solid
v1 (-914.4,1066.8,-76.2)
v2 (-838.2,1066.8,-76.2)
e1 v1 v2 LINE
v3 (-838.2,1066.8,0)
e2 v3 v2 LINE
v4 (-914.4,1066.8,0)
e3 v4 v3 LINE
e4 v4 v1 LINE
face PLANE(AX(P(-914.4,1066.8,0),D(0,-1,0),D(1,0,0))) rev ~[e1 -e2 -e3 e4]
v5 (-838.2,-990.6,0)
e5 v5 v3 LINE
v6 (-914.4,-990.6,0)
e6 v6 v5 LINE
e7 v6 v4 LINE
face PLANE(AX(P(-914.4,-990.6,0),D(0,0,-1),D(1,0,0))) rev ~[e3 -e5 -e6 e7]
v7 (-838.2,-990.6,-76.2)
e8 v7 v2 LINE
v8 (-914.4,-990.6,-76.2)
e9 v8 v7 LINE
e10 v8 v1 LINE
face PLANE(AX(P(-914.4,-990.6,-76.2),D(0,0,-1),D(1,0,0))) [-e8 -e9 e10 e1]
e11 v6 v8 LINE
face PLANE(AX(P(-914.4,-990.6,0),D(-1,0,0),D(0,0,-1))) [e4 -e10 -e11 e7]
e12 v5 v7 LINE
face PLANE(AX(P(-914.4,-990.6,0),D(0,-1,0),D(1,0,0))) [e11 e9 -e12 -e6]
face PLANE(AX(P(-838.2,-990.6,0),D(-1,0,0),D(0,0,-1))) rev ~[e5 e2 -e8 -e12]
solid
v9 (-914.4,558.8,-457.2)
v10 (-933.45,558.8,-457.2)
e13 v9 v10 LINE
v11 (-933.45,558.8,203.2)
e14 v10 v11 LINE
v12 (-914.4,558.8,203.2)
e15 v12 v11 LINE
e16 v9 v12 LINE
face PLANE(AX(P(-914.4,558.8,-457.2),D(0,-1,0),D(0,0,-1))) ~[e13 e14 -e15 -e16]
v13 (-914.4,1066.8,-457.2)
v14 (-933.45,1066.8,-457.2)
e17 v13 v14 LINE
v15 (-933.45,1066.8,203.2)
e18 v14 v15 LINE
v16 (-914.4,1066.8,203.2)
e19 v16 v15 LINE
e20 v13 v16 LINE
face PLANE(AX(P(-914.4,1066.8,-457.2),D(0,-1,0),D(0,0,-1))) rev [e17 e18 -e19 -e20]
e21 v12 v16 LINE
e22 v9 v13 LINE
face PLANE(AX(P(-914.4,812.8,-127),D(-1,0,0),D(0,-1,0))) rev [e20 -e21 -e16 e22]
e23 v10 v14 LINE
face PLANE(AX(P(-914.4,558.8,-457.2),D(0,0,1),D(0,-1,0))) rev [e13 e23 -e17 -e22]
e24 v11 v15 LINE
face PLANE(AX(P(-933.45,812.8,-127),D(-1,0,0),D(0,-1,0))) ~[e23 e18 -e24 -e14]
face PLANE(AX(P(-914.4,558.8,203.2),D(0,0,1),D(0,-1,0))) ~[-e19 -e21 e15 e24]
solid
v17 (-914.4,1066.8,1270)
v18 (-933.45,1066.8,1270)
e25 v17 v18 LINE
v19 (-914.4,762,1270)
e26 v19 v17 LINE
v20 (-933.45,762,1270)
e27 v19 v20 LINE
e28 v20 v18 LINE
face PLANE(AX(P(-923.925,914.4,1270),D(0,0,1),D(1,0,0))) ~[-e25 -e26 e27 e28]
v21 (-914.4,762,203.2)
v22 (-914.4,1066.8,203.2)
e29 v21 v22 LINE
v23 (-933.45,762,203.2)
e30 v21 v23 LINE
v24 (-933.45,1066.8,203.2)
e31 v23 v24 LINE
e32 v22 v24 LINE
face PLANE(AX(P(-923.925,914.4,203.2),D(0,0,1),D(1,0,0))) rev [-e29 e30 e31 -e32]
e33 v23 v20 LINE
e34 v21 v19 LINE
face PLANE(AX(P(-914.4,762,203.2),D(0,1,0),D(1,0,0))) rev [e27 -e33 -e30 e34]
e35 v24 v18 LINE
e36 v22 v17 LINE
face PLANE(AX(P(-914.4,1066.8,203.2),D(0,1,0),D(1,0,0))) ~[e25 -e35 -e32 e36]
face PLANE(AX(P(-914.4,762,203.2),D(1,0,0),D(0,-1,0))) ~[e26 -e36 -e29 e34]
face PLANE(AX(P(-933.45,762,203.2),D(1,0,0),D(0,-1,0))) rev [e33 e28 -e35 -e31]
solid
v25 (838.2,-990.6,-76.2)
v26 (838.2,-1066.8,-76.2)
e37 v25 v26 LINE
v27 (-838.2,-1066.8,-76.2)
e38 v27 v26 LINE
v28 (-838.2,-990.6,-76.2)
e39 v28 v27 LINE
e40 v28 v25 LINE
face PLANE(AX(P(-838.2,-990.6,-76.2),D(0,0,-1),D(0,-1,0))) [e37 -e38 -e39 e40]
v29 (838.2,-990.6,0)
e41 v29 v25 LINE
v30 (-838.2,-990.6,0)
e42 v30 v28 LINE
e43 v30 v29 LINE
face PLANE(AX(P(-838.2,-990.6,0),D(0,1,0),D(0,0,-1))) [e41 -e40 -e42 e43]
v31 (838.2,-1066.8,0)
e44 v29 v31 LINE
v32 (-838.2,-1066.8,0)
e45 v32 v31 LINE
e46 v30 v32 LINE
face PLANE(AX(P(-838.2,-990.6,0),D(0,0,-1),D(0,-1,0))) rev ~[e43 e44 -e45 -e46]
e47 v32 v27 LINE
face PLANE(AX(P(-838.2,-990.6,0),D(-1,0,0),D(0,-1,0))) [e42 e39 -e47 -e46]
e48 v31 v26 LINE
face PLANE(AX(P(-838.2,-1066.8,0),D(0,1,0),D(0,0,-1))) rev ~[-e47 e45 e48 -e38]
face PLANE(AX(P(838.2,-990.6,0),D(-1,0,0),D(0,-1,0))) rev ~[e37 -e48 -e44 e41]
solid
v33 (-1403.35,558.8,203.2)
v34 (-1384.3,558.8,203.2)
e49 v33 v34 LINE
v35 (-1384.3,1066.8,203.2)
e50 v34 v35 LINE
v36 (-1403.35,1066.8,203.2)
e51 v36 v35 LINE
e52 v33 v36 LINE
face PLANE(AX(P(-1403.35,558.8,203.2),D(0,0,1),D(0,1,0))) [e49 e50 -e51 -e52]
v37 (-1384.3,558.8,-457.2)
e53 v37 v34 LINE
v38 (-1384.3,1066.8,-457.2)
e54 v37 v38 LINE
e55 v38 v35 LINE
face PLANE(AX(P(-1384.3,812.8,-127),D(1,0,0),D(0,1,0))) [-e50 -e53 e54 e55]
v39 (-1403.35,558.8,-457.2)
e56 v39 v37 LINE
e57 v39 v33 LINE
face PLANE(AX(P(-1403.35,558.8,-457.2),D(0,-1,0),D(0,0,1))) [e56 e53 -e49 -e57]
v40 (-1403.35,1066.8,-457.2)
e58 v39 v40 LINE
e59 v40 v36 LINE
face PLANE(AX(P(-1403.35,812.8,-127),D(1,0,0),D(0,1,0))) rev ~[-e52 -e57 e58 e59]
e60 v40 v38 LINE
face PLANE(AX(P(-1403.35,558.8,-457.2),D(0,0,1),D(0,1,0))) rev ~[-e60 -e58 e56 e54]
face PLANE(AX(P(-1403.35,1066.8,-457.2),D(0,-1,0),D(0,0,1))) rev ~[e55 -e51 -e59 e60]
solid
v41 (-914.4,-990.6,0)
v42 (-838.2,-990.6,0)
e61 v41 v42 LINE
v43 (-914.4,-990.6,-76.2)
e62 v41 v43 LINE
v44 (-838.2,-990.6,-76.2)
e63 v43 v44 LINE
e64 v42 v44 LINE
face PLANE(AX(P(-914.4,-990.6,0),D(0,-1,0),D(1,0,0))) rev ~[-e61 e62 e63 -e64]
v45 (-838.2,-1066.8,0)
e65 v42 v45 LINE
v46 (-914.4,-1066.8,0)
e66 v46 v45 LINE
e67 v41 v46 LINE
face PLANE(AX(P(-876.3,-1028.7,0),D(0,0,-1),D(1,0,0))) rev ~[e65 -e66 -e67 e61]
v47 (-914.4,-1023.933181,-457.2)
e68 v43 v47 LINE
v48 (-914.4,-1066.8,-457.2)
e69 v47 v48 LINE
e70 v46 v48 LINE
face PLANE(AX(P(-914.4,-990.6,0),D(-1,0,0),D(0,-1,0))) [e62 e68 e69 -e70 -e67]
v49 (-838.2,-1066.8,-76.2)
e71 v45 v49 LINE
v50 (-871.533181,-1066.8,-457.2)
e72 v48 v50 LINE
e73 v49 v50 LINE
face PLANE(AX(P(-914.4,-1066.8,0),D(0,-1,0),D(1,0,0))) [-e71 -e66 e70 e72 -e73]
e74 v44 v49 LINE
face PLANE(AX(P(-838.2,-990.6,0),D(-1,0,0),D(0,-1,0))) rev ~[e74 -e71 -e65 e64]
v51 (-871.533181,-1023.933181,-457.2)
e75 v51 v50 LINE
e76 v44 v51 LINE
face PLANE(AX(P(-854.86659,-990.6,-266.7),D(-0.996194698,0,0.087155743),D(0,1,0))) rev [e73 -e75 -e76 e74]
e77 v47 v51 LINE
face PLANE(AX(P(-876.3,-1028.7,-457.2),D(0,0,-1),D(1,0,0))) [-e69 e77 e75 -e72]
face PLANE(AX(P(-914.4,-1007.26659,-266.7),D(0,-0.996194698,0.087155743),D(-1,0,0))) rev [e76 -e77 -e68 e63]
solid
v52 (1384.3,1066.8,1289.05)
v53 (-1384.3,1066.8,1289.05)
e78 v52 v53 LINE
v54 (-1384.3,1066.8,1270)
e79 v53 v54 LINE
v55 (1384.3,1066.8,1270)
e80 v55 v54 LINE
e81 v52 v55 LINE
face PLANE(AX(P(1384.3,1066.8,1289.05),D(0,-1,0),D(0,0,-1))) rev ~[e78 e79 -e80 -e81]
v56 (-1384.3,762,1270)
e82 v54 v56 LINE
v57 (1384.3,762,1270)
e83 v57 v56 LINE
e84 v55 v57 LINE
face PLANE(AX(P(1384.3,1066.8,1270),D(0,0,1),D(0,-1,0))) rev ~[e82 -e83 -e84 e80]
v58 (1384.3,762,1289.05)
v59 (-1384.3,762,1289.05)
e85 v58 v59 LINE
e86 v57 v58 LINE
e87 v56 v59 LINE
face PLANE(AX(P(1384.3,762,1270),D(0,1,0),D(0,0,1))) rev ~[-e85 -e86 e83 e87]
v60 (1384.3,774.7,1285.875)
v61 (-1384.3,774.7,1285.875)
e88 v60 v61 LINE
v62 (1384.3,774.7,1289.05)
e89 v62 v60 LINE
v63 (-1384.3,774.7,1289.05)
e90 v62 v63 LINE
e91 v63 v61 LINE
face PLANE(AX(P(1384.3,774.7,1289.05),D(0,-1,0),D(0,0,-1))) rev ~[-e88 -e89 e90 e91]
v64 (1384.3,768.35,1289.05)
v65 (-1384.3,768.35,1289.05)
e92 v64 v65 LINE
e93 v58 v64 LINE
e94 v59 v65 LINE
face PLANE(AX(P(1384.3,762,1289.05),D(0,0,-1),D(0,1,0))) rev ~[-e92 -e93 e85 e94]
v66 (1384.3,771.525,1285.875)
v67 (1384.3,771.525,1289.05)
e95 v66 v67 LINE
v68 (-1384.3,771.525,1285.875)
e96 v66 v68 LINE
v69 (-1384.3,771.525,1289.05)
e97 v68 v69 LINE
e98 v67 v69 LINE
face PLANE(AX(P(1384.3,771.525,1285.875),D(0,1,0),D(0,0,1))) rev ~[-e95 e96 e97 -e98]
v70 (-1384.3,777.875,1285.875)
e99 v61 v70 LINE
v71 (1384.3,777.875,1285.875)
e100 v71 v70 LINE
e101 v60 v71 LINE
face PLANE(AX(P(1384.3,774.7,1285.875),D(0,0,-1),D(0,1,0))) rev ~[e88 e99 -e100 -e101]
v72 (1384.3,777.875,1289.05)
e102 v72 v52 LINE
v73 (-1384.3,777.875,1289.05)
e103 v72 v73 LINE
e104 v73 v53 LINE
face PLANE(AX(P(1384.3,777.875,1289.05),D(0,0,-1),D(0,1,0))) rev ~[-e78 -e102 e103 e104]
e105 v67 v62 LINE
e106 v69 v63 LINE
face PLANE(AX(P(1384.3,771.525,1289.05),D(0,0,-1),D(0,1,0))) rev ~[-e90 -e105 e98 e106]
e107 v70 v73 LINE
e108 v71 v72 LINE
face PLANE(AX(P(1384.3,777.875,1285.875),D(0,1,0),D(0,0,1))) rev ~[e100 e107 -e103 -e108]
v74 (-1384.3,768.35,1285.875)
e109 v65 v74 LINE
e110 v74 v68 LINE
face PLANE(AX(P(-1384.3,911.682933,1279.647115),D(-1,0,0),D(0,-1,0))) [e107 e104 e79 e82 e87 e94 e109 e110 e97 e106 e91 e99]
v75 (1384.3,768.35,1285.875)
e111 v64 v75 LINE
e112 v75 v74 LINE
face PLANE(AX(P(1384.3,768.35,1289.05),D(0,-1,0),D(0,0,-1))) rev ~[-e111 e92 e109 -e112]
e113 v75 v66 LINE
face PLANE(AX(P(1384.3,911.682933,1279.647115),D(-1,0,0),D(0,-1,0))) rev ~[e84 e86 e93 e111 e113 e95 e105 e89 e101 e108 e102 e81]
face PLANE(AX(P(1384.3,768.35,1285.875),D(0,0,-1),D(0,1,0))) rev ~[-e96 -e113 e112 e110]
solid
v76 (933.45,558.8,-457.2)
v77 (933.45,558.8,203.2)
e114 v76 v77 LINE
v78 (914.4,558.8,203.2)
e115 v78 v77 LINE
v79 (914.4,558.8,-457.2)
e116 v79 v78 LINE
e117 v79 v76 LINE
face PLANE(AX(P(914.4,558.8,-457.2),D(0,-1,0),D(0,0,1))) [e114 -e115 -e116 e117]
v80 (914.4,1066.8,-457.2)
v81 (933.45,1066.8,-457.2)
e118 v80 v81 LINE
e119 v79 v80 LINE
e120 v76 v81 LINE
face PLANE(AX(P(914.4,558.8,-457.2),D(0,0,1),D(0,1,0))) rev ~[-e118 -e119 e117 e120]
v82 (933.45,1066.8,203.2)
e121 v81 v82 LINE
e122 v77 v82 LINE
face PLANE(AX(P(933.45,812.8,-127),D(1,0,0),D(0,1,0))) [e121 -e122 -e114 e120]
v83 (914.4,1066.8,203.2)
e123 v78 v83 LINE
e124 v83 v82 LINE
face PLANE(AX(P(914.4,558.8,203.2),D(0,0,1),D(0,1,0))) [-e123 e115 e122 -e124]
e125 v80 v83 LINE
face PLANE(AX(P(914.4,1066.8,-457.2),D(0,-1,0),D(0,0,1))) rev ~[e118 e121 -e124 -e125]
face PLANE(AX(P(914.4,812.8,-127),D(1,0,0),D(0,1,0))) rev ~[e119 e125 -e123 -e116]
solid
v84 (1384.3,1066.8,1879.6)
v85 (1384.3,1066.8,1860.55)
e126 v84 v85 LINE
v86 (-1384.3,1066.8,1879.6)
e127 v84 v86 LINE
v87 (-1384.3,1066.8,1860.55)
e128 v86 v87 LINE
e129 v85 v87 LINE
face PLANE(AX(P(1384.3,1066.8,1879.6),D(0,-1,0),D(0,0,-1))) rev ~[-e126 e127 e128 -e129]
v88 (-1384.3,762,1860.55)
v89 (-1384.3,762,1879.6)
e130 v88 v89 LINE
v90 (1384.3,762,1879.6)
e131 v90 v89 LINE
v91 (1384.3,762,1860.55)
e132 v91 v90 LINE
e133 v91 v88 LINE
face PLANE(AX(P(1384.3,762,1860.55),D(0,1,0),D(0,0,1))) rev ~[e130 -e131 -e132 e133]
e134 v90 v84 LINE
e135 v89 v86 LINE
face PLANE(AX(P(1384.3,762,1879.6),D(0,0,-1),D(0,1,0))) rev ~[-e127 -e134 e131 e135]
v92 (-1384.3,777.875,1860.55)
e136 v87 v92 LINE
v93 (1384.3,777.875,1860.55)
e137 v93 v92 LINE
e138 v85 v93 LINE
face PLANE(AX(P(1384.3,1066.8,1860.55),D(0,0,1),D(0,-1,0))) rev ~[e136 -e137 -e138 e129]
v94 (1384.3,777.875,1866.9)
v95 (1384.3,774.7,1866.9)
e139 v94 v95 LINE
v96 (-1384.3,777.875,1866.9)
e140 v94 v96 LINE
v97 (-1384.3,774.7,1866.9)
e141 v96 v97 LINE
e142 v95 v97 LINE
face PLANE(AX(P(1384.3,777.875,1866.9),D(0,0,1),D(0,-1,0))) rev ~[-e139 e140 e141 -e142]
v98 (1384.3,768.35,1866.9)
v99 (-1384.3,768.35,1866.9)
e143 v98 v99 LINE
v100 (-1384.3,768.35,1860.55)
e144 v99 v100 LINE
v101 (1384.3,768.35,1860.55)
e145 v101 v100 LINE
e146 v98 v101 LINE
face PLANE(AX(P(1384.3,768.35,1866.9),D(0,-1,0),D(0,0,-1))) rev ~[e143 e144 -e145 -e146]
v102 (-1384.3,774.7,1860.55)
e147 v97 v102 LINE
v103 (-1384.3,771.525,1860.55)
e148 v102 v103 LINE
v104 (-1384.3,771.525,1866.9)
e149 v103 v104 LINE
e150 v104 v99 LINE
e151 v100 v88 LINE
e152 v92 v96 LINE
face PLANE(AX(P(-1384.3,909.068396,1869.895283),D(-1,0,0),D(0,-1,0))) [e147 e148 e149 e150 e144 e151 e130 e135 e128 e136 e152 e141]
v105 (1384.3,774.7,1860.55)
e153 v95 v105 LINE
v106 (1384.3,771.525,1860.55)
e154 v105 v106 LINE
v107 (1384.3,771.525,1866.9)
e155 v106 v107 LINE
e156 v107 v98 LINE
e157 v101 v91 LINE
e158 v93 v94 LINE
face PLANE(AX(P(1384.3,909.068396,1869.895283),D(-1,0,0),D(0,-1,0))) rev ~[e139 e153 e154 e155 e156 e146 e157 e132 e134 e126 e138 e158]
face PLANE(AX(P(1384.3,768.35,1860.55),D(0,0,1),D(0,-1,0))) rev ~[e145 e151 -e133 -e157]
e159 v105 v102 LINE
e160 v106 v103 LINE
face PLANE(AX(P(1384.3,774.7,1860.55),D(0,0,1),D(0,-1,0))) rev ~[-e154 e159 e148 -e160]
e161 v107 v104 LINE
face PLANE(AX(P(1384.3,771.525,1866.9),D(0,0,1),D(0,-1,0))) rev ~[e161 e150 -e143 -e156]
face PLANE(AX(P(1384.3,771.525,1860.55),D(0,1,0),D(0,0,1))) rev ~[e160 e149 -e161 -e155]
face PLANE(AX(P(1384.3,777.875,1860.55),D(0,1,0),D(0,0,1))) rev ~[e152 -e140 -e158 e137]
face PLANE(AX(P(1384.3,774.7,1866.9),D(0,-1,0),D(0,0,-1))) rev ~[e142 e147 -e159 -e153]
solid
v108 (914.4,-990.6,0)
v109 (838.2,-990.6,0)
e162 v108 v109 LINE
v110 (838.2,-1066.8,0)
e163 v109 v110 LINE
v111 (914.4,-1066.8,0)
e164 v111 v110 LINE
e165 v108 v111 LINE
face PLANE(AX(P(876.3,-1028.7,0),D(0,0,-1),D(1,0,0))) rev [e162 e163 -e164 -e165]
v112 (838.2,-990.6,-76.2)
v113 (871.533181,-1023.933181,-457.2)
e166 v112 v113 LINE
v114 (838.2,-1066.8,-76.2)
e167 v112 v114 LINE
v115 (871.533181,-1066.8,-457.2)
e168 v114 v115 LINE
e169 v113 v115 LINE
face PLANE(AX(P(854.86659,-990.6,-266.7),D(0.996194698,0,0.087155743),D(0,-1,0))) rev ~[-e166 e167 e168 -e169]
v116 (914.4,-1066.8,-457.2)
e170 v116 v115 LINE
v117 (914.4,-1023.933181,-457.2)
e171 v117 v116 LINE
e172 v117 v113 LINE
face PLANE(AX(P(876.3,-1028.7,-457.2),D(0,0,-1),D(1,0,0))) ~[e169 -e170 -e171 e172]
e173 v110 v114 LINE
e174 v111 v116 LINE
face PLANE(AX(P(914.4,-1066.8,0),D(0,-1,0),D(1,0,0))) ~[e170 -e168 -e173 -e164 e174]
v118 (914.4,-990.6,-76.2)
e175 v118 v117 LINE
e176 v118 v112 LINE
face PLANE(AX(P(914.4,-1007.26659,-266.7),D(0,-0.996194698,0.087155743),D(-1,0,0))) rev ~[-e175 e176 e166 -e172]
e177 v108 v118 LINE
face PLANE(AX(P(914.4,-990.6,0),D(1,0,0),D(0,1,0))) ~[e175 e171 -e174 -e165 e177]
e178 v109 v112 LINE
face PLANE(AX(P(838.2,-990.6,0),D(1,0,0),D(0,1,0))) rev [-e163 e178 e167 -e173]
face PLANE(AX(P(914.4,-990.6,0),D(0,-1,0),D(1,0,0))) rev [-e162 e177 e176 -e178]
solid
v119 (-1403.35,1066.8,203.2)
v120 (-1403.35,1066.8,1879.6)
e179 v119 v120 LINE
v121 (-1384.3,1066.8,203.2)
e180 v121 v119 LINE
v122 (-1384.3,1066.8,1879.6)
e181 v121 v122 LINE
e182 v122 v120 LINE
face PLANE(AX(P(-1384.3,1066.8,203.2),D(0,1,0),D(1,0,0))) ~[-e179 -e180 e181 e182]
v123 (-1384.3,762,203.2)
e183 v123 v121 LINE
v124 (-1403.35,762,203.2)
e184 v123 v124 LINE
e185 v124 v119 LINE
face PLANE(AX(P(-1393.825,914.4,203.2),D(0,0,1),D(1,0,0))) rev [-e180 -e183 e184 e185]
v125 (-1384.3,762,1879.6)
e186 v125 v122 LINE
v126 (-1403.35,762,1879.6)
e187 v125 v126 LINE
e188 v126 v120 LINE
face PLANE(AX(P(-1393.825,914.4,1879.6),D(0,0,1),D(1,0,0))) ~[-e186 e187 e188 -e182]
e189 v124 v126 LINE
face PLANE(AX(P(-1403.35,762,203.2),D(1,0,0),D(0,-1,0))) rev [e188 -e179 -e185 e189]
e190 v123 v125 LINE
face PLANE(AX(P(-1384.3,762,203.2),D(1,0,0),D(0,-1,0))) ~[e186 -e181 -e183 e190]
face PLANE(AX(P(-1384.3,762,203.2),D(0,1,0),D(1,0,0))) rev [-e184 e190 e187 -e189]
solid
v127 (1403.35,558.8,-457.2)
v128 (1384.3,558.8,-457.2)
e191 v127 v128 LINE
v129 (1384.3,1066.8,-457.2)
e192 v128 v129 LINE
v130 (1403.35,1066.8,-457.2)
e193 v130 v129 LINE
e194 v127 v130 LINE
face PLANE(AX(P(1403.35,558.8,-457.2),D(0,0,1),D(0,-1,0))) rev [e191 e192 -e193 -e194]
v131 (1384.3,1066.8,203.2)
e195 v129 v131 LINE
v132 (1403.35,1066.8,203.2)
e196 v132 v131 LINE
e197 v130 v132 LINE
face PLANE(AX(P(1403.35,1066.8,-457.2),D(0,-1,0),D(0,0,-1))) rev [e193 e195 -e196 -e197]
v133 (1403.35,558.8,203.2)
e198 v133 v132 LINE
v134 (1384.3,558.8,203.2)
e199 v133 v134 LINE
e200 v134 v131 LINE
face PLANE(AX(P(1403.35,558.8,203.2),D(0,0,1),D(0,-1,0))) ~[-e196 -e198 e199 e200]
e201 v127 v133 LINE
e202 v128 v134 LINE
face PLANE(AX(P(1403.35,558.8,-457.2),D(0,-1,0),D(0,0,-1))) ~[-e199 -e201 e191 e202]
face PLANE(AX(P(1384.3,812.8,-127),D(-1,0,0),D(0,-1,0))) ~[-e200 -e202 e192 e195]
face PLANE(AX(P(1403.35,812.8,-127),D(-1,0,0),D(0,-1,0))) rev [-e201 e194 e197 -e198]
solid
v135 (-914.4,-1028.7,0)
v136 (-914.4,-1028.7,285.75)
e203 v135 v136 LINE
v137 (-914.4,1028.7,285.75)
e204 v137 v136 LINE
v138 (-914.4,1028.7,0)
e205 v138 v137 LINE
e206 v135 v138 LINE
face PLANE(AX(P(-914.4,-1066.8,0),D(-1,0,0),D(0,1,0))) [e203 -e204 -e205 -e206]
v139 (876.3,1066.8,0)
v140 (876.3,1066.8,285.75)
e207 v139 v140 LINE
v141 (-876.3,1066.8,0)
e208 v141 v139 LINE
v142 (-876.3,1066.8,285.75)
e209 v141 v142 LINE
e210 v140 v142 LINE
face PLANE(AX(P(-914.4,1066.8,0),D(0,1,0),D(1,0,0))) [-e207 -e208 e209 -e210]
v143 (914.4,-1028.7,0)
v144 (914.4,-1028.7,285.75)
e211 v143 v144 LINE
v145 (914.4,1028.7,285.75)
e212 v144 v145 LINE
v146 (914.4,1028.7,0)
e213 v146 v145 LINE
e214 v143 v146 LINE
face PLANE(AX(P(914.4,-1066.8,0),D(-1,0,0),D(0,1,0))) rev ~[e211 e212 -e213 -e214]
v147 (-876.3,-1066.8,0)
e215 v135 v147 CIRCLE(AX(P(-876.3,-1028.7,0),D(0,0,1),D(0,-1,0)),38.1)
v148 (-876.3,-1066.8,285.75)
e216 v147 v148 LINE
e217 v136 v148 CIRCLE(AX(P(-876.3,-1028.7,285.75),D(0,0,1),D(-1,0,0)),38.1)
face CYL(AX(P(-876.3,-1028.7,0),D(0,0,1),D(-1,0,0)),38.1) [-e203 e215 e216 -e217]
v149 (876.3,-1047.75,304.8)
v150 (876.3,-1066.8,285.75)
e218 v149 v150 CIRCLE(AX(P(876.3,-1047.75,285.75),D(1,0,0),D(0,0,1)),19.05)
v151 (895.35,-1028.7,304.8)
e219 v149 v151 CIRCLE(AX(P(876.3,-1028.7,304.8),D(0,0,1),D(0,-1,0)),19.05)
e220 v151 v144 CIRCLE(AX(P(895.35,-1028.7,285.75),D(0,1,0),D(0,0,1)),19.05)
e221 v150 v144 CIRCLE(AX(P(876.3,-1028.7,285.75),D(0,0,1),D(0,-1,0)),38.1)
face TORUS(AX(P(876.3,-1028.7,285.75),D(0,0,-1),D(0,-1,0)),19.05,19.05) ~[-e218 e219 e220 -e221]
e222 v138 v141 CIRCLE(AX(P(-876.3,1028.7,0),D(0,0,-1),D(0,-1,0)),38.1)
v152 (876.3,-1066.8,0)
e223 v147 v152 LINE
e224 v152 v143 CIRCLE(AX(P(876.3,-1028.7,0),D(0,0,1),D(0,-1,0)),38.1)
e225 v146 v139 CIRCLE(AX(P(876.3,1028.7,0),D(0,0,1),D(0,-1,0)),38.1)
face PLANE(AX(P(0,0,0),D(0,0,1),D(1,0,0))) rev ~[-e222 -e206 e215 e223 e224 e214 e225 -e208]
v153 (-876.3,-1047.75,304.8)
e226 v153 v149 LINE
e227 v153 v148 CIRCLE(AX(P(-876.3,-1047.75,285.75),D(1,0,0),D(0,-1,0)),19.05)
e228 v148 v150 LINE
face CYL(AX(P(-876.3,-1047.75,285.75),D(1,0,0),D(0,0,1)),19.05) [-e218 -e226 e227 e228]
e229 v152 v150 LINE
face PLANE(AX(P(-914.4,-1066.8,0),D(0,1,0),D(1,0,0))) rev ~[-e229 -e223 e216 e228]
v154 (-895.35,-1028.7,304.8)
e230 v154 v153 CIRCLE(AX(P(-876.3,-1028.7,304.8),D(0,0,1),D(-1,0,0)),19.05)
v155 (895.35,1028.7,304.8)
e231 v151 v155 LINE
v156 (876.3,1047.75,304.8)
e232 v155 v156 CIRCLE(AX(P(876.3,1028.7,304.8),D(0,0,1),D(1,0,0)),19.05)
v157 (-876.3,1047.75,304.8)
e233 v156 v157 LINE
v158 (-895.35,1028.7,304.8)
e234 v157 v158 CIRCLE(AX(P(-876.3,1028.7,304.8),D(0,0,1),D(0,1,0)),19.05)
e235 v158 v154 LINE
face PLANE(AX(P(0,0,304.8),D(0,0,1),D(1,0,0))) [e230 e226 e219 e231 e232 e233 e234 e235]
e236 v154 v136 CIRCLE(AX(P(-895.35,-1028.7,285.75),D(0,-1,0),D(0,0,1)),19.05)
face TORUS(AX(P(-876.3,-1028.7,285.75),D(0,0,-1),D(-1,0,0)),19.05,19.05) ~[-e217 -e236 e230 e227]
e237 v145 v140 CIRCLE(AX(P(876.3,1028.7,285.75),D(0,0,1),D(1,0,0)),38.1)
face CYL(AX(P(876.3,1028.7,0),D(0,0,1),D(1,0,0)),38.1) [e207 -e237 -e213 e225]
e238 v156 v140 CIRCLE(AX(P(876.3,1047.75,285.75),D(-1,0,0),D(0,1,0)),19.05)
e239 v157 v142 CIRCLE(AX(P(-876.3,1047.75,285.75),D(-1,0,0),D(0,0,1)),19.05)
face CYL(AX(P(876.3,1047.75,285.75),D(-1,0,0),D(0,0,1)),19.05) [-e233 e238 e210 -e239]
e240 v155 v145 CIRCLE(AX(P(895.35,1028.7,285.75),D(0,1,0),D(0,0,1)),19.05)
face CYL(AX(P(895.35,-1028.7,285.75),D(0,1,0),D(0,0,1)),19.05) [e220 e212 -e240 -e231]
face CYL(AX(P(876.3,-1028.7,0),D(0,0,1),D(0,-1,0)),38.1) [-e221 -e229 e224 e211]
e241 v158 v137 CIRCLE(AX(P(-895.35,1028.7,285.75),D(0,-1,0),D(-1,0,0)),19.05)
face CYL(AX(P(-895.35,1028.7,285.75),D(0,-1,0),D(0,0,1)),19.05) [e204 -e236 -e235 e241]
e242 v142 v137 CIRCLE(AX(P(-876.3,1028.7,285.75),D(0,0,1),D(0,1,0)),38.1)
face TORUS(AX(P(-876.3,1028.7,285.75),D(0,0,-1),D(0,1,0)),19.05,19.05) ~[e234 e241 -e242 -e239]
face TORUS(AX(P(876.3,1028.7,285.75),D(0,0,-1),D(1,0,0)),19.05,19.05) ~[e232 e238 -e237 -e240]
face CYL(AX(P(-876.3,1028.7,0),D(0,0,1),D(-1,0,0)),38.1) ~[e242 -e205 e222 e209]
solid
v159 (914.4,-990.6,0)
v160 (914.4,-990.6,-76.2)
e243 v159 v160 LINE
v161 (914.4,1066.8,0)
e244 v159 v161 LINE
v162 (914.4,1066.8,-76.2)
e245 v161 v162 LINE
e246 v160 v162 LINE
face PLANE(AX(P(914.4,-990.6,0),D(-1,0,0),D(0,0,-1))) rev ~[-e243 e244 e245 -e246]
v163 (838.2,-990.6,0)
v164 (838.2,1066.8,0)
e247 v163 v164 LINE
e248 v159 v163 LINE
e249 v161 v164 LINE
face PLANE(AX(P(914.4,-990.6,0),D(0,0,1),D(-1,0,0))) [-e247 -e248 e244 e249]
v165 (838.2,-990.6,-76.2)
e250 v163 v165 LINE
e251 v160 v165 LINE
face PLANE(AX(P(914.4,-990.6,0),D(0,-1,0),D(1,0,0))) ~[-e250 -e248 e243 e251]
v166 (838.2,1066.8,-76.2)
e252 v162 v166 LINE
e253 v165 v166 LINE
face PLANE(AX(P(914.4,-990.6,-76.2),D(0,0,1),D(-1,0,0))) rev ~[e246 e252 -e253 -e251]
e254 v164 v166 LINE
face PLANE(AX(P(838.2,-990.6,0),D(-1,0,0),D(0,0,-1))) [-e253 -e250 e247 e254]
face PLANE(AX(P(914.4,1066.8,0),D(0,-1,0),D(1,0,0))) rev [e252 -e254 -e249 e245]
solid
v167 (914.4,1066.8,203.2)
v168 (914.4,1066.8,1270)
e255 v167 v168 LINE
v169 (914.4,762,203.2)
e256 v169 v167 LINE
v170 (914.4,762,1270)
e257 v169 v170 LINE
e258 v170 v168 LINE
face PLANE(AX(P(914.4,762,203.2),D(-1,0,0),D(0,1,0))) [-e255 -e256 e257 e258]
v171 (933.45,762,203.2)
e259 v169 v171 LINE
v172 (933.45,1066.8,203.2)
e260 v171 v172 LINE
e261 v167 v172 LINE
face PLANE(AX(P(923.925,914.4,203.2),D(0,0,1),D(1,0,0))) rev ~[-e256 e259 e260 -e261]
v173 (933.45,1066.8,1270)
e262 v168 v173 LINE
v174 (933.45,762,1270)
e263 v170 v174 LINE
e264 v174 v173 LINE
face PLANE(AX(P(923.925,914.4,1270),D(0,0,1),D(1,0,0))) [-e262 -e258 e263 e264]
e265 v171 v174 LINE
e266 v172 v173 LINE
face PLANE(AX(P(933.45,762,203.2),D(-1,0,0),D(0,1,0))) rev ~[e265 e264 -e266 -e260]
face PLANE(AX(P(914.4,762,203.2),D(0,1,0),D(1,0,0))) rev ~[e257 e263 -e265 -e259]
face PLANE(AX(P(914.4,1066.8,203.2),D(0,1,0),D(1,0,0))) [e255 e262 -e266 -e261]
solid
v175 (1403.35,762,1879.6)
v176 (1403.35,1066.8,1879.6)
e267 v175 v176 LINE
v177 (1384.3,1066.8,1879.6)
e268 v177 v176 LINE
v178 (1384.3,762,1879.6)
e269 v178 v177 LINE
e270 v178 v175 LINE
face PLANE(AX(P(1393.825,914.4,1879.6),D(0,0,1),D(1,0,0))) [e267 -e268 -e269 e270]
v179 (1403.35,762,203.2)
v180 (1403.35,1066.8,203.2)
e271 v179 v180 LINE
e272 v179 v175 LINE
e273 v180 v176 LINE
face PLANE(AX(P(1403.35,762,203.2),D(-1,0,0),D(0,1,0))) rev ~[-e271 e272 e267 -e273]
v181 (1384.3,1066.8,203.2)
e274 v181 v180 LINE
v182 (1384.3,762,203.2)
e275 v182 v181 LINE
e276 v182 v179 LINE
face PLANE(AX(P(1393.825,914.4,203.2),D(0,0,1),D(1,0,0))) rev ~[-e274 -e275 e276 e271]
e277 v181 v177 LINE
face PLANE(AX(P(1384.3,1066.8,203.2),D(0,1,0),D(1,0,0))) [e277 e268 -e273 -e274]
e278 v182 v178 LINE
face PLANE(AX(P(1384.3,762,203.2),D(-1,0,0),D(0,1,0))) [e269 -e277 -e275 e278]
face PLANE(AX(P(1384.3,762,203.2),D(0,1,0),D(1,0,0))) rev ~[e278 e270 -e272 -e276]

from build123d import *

# Parameters (mm, degrees)
F0_W      = 1828.8
F0_H      = 2133.6
F1_DEPTH  = 304.8
F2_R      = 38.1
F3_R      = 19.05
F5_W      = 76.2
F5_H      = 76.2
F6_DEPTH  = 457.2
F7_SIZE2  = 33.3331808034
F7_SIZE   = 381
F9_DEPTH  = 1676.4
F10_DEPTH = 2057.4
F11_W     = 508
F11_H     = 660.4
F12_DEPTH = 19.05
F15_W     = 19.05
F15_H     = 304.8
F16_DEPTH = 1676.4
F17_DEPTH = 1066.8
F20_DEPTH = 2768.6


with BuildPart() as f1:
    # F0 (on Top) → F1 (new body)
    with BuildSketch(Plane.XY):
        Rectangle(F0_W, F0_H)
    extrude(amount=F1_DEPTH)

    # F2
    f2_edges = [f1.edges().sort_by_distance(p)[0] for p in [
        (-914.4, -1066.8, 152.4),
        (914.4, -1066.8, 152.4),
        (914.4, 1066.8, 152.4),
        (-914.4, 1066.8, 152.4),
    ]]
    fillet(f2_edges, radius=F2_R)

    # F3
    f3_edges = [f1.edges().sort_by_distance(p)[0] for p in [
        (914.4, 0, 304.8),
        (903.240768, -1055.640768, 304.8),
        (903.240768, 1055.640768, 304.8),
        (0, -1066.8, 304.8),
        (0, 1066.8, 304.8),
        (-903.240768, -1055.640768, 304.8),
        (-903.240768, 1055.640768, 304.8),
        (-914.4, 0, 304.8),
    ]]
    fillet(f3_edges, radius=F3_R)


with BuildPart() as f6:
    # F5 (on face) → F6 (new body)
    with BuildSketch(Plane(origin=(0, 0, 0), x_dir=(1, 0, 0), z_dir=(0, 0, -1))):
        with Locations((-876.3, 1028.7)):
            Rectangle(F5_W, F5_H)
    extrude(amount=F6_DEPTH)

    # F7
    f7_edges = [f6.edges().sort_by_distance(p)[0] for p in [
        (-876.3, -990.6, -457.2),
        (-838.2, -1028.7, -457.2),
    ]]
    chamfer(f7_edges, length=F7_SIZE, length2=F7_SIZE2)


with BuildPart() as f8_1:
    # F8: instance of F6
    add(f6.part.mirror(Plane.YZ))


with BuildPart() as f9:
    # F9 (new, through all): a face of the model
    f9_faces = [f6.part.faces().sort_by_distance(p)[0] for p in [
        (-838.2, -1028.7, -38.1),
    ]]
    extrude(f9_faces, amount=F9_DEPTH)


with BuildPart() as f10:
    # F10 (new, through all): a face of the model
    f10_faces = [f8_1.part.faces().sort_by_distance(p)[0] for p in [
        (876.3, -990.6, -38.1),
    ]]
    extrude(f10_faces, amount=F10_DEPTH)


with BuildPart() as f10b:
    # F10#2 (new, through all): a face of the model
    f10_2_faces = [f6.part.faces().sort_by_distance(p)[0] for p in [
        (-876.3, -990.6, -38.1),
    ]]
    extrude(f10_2_faces, amount=F10_DEPTH)


with BuildPart() as f12:
    # F11 (on face) → F12 (new body)
    with BuildSketch(Plane.YZ.offset(914.4)):
        with Locations((812.8, -127)):
            Rectangle(F11_W, F11_H)
    extrude(amount=F12_DEPTH)


with BuildPart() as f14_1:
    # F14: instance of F12
    add(f12.part.mirror(Plane(origin=(1158.875, 812.8, -127), x_dir=(0, 1, 0), z_dir=(1, 0, 0))))


with BuildPart() as f16:
    # F15 (on face) → F16 (new body)
    with BuildSketch(Plane.XY.offset(203.2)):
        with Locations((1393.825, 914.4)):
            Rectangle(F15_W, F15_H)
    extrude(amount=F16_DEPTH)


with BuildPart() as f17:
    # F15 (on face) → F17 (new body, through all)
    with BuildSketch(Plane.XY.offset(203.2)):
        with Locations((923.925, 914.4)):
            Rectangle(F15_W, F15_H)
    extrude(amount=F17_DEPTH)


with BuildPart() as f18_1:
    # F18: instance of F12
    add(f12.part.mirror(Plane.YZ))


with BuildPart() as f18_2:
    # F18: instance of F16
    add(f16.part.mirror(Plane.YZ))


with BuildPart() as f18_3:
    # F18: instance of F14_1
    add(f14_1.part.mirror(Plane.YZ))


with BuildPart() as f18_4:
    # F18: instance of F17
    add(f17.part.mirror(Plane.YZ))


with BuildPart() as f20:
    # F19 (on face) → F20 (new body, through all)
    with BuildSketch(Plane(origin=(1384.3, 0, 0), x_dir=(0, -1, 0), z_dir=(-1, 0, 0))):
        Polygon((-762, 1879.6), (-1066.8, 1879.6), (-1066.8, 1860.55), (-777.875, 1860.55), (-777.875, 1866.9), (-774.7, 1866.9), (-774.7, 1860.55), (-771.525, 1860.55), (-771.525, 1866.9), (-768.35, 1866.9), (-768.35, 1860.55), (-762, 1860.55), align=None)
    extrude(amount=F20_DEPTH)


with BuildPart() as f20b:
    # F19 (on face) → F20, piece 2 (new body, through all)
    with BuildSketch(Plane(origin=(1384.3, 0, 0), x_dir=(0, -1, 0), z_dir=(-1, 0, 0))):
        Polygon((-777.875, 1289.05), (-1066.8, 1289.05), (-1066.8, 1270), (-762, 1270), (-762, 1289.05), (-768.35, 1289.05), (-768.35, 1285.875), (-771.525, 1285.875), (-771.525, 1289.05), (-774.7, 1289.05), (-774.7, 1285.875), (-777.875, 1285.875), align=None)
    extrude(amount=F20_DEPTH)


solid = Compound([f1.part, f6.part, f8_1.part, f9.part, f10.part, f10b.part, f12.part, f14_1.part, f16.part, f17.part, f18_1.part, f18_2.part, f18_3.part, f18_4.part, f20.part, f20b.part])
